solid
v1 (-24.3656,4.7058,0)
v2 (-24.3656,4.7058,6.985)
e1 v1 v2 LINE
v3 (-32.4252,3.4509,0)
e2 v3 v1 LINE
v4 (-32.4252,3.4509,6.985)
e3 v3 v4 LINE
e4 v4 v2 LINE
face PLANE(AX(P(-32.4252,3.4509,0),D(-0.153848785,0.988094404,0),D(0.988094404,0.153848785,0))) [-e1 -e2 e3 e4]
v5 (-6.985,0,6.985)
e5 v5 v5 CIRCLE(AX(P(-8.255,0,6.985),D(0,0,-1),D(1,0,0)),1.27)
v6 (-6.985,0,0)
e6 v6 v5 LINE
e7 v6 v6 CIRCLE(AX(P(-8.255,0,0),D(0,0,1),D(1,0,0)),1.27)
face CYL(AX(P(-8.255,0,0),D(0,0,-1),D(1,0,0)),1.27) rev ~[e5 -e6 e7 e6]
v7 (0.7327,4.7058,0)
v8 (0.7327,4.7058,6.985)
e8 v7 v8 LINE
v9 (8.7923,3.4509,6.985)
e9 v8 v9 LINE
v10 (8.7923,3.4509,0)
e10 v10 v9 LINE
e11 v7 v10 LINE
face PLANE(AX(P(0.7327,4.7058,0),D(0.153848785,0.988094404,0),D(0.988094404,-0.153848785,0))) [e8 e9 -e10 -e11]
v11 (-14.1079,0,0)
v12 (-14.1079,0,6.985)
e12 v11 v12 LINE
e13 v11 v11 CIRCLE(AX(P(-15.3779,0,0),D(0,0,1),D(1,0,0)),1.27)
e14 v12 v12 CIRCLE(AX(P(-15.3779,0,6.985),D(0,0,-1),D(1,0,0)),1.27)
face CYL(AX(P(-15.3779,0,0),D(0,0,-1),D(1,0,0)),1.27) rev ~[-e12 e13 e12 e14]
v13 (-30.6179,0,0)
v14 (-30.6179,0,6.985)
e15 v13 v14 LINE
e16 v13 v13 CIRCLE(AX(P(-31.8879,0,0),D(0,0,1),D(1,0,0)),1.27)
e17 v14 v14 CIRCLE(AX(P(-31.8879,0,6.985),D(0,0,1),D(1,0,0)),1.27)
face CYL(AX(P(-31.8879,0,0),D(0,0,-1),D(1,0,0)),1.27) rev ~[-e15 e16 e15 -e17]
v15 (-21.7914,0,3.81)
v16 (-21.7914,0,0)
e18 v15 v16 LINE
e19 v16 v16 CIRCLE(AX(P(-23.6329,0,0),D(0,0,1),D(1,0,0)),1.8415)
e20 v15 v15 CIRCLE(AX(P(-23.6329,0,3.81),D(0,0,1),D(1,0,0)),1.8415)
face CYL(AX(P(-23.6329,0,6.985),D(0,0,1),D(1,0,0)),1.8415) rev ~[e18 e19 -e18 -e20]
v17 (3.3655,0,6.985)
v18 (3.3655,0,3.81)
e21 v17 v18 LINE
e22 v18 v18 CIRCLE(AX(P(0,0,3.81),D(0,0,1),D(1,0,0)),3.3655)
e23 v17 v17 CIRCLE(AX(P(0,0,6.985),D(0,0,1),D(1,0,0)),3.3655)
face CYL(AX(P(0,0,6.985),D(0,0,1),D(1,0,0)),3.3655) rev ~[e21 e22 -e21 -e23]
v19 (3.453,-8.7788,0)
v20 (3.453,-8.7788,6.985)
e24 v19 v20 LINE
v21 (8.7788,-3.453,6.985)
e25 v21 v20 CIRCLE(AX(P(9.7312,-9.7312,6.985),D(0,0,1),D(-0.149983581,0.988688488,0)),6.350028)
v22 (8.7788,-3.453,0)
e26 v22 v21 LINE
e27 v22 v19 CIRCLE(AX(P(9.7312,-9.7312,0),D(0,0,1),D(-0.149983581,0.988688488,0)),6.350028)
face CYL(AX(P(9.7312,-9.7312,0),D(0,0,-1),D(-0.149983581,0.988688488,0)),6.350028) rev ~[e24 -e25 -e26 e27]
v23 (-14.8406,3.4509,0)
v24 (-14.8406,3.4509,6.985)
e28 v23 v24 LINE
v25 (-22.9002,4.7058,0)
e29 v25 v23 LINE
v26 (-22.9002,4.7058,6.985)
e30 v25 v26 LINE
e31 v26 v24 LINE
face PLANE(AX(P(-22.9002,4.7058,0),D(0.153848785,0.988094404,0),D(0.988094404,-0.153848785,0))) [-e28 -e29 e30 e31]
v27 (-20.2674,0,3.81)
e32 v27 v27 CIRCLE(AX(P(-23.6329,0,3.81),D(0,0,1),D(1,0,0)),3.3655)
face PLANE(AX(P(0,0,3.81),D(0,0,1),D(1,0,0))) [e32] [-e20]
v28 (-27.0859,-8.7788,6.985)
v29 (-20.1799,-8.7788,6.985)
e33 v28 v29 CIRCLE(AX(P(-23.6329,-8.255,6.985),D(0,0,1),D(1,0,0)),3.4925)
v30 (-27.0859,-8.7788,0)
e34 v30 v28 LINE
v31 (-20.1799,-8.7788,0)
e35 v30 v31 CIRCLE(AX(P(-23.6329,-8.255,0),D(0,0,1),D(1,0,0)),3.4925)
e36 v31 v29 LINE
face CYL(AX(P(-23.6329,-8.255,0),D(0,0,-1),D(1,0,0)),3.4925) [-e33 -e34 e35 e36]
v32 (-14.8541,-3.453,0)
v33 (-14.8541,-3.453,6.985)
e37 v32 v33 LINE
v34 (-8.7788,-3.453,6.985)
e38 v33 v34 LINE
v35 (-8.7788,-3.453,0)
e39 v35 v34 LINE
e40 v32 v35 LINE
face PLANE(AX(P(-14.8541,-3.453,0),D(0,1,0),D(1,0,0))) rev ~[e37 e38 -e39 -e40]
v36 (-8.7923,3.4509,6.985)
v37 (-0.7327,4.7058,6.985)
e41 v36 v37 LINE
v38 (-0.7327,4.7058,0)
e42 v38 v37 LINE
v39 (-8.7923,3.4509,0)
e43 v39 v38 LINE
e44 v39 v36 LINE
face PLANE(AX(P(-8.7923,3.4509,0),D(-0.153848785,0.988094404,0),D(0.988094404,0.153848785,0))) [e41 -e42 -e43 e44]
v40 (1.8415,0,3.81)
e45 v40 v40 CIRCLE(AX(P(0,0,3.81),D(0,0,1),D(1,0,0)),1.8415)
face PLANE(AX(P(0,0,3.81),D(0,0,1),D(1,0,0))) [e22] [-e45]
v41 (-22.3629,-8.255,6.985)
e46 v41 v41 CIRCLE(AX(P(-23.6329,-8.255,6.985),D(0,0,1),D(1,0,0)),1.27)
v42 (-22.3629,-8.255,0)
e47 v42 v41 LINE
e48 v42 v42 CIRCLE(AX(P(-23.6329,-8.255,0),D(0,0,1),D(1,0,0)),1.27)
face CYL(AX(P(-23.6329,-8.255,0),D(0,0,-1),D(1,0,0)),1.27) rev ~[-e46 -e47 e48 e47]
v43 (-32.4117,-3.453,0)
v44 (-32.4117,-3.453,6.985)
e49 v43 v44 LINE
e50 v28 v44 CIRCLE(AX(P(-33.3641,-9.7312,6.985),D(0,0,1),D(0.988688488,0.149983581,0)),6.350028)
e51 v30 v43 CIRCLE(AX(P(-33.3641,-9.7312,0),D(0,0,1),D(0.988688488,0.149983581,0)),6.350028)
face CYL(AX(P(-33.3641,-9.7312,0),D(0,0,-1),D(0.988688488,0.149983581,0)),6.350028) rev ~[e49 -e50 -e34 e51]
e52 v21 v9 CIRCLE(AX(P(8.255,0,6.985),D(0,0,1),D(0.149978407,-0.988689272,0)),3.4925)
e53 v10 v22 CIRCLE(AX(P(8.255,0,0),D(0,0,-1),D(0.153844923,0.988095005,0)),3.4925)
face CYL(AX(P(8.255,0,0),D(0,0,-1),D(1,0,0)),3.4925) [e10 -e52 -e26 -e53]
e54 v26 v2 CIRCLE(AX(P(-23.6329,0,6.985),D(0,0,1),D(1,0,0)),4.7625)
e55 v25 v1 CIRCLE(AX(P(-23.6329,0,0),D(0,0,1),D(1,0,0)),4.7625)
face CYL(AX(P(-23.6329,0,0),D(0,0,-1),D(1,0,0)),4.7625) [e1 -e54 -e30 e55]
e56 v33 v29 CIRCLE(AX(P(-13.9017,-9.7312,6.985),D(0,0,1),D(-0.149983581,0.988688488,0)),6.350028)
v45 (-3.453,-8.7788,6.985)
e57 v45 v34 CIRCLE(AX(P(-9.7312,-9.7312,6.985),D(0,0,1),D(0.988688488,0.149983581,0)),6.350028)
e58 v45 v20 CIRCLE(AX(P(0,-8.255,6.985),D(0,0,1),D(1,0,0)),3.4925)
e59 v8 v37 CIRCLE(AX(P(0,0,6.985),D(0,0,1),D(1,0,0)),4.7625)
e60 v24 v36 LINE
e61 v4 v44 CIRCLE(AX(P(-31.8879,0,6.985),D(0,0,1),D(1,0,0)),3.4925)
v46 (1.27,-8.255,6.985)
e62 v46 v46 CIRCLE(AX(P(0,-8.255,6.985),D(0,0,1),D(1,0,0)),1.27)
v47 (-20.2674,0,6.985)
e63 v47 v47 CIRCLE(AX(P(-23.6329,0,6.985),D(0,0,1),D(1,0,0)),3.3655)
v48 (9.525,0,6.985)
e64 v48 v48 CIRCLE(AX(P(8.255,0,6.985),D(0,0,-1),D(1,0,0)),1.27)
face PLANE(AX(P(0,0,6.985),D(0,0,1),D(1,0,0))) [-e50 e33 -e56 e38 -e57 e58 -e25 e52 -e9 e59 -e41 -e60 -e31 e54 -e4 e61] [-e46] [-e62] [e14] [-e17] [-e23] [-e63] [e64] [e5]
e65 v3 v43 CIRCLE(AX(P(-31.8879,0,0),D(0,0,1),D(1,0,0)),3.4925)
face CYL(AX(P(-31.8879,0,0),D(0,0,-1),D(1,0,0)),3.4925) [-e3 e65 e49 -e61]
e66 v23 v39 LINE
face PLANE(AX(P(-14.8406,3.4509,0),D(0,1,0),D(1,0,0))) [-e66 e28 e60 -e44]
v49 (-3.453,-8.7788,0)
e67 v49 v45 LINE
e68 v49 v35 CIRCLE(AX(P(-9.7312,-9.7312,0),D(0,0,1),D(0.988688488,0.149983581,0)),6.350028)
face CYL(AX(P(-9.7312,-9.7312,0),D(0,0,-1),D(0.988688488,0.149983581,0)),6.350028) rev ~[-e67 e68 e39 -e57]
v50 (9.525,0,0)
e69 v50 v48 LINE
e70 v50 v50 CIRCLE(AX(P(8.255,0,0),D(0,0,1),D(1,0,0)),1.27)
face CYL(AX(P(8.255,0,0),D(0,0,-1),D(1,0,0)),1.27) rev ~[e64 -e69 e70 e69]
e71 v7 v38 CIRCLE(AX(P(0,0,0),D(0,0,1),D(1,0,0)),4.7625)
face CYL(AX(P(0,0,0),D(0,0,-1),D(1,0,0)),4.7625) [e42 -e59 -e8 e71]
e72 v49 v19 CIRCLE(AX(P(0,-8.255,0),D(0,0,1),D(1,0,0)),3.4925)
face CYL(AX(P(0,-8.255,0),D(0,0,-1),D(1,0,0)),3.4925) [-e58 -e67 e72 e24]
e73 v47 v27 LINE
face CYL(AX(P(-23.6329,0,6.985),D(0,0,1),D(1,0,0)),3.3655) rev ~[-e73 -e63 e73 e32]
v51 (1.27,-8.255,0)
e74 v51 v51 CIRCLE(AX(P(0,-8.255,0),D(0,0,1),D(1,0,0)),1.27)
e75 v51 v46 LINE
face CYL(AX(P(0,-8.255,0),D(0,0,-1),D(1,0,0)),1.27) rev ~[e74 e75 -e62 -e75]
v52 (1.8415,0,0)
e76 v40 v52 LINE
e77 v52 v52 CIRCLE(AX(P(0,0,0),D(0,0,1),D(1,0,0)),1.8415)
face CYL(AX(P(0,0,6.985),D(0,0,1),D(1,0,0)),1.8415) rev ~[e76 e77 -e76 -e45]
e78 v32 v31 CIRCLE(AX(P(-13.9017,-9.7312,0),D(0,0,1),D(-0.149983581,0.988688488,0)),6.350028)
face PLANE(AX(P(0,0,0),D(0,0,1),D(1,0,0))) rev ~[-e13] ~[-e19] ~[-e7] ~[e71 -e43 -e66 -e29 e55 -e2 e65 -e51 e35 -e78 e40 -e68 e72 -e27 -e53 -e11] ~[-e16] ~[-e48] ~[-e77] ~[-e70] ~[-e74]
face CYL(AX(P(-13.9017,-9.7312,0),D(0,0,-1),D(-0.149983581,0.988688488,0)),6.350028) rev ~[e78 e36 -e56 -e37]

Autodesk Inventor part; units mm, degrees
ref_plane "YZ Plane" through (0, 0, 0) normal (1, 0, 0) x (0, 1, 0)
ref_plane "XZ Plane" through (0, 0, 0) normal (0, 1, 0) x (-1, 0, 0)
ref_plane "XY Plane" through (0, 0, 0) normal (0, 0, 1) x (1, 0, 0)
sketch "Sketch5" plane through (0, 0, 0) normal (0, 0, 1) x (1, 0, 0)
  line L0 (0, 0) -> (8.255, 0)
  circle A0 centre (8.255, 0) radius 1.27
  circle A1 centre (0, -8.255) radius 1.27
  circle A2 centre (-8.255, 0) radius 1.27
  line L1 (0, 0) -> (-23.6329, 0)
  line L2 (-23.6329, 0) -> (-15.3779, 0)
  circle A3 centre (-15.3779, 0) radius 1.27
  circle A4 centre (-23.6329, -8.255) radius 1.27
  circle A5 centre (-31.8879, 0) radius 1.27
  circle A6 centre (-31.8879, 0) radius 3.4925
  circle A7 centre (-23.6329, -8.255) radius 3.4925
  circle A8 centre (-15.3779, 0) radius 3.4925
  circle A9 centre (-8.255, 0) radius 3.4925
  circle A10 centre (0, -8.255) radius 3.4925
  circle A11 centre (8.255, 0) radius 3.4925
  circle A12 centre (-23.6329, 0) radius 4.7625
  circle A13 centre (0, 0) radius 4.7625
  line L3 (-32.4252, 3.4509) -> (-24.3656, 4.7058)
  line L4 (-22.9002, 4.7058) -> (-14.8406, 3.4509)
  line L5 (-8.7923, 3.4509) -> (-0.7327, 4.7058)
  line L6 (0.7327, 4.7058) -> (8.7923, 3.4509)
  arc A14 (8.7788, -3.453) -> (3.453, -8.7788) centre (9.7312, -9.7312) ccw
  arc A15 (-3.453, -8.7788) -> (-8.7788, -3.453) centre (-9.7312, -9.7312) ccw
  arc A16 (-14.8541, -3.453) -> (-20.1799, -8.7788) centre (-13.9017, -9.7312) ccw
  arc A17 (-27.0859, -8.7788) -> (-32.4117, -3.453) centre (-33.3641, -9.7312) ccw
  line L7 (-14.8406, 3.4509) -> (-8.7923, 3.4509)
  line L8 (-14.8541, -3.453) -> (-8.7788, -3.453)
  dimension "d45" = 8.255
  dimension "d46" = 2.54
  dimension "d49" = 180
  dimension "d51" = 23.6329
  dimension "d52" = 8.255
  dimension "d53" = 2.54
  dimension "d56" = 180
  dimension "d58" = 6.985
  dimension "d59" = 6.985
  dimension "d60" = 6.985
  dimension "d61" = 6.985
  dimension "d62" = 6.985
  dimension "d63" = 6.985
  dimension "d64" = 9.525
  dimension "d65" = 9.525
  dimension "d66" = 6.35
  dimension "d67" = 6.35
  dimension "d68" = 6.35
  dimension "d69" = 6.35
extrude "Extrusion7" add sketch "Sketch5" along normal blind 6.985 contours L1 A13 L0 | L0 A13 L1 | A13 L6 A11 | A11 | A11 A14 A10 A13 | A9 L1 A2 | L1 A2 A9 | A13 A10 A15 A9 | A9 L5 A13 | A10 | A9 L1 A8 L7 | L8 A8 L1 A9 | A8 L1 A3 | A8 A12 L4 | A16 A7 A12 A8 | A8 L1 A3 | A12 | A7 | A7 A17 A6 A12 | A12 A6 L3 | A6
sketch "Sketch6" plane through (0, 0, 6.985) normal (0, 0, 1) x (1, 0, 0)
  circle A0 centre (0, 0) radius 1.8415
  circle A1 centre (0, 0) radius 3.3655
  circle A2 centre (-23.6329, 0) radius 1.8415
  circle A3 centre (-23.6329, 0) radius 3.3655
  dimension "d72" = 3.683
  dimension "d73" = 6.731
  dimension "d74" = 23.6329
  dimension "d75" = 3.683
  dimension "d76" = 6.731
extrude "Extrusion8" cut sketch "Sketch6" against normal through all contours A0 | A2
extrude "Extrusion9" cut sketch "Sketch6" against normal blind 3.175
equation "\"d59\" = d58"
equation "\"d60\" = d58"
equation "\"d61\" = d58"
equation "\"d62\" = d58"
equation "\"d63\" = d58"
equation "\"d67\" = d66"
equation "\"d68\" = d66"
equation "\"d69\" = d66"
properties part number "carriageIdlerPinionExtension" material "ABS Plastic"
